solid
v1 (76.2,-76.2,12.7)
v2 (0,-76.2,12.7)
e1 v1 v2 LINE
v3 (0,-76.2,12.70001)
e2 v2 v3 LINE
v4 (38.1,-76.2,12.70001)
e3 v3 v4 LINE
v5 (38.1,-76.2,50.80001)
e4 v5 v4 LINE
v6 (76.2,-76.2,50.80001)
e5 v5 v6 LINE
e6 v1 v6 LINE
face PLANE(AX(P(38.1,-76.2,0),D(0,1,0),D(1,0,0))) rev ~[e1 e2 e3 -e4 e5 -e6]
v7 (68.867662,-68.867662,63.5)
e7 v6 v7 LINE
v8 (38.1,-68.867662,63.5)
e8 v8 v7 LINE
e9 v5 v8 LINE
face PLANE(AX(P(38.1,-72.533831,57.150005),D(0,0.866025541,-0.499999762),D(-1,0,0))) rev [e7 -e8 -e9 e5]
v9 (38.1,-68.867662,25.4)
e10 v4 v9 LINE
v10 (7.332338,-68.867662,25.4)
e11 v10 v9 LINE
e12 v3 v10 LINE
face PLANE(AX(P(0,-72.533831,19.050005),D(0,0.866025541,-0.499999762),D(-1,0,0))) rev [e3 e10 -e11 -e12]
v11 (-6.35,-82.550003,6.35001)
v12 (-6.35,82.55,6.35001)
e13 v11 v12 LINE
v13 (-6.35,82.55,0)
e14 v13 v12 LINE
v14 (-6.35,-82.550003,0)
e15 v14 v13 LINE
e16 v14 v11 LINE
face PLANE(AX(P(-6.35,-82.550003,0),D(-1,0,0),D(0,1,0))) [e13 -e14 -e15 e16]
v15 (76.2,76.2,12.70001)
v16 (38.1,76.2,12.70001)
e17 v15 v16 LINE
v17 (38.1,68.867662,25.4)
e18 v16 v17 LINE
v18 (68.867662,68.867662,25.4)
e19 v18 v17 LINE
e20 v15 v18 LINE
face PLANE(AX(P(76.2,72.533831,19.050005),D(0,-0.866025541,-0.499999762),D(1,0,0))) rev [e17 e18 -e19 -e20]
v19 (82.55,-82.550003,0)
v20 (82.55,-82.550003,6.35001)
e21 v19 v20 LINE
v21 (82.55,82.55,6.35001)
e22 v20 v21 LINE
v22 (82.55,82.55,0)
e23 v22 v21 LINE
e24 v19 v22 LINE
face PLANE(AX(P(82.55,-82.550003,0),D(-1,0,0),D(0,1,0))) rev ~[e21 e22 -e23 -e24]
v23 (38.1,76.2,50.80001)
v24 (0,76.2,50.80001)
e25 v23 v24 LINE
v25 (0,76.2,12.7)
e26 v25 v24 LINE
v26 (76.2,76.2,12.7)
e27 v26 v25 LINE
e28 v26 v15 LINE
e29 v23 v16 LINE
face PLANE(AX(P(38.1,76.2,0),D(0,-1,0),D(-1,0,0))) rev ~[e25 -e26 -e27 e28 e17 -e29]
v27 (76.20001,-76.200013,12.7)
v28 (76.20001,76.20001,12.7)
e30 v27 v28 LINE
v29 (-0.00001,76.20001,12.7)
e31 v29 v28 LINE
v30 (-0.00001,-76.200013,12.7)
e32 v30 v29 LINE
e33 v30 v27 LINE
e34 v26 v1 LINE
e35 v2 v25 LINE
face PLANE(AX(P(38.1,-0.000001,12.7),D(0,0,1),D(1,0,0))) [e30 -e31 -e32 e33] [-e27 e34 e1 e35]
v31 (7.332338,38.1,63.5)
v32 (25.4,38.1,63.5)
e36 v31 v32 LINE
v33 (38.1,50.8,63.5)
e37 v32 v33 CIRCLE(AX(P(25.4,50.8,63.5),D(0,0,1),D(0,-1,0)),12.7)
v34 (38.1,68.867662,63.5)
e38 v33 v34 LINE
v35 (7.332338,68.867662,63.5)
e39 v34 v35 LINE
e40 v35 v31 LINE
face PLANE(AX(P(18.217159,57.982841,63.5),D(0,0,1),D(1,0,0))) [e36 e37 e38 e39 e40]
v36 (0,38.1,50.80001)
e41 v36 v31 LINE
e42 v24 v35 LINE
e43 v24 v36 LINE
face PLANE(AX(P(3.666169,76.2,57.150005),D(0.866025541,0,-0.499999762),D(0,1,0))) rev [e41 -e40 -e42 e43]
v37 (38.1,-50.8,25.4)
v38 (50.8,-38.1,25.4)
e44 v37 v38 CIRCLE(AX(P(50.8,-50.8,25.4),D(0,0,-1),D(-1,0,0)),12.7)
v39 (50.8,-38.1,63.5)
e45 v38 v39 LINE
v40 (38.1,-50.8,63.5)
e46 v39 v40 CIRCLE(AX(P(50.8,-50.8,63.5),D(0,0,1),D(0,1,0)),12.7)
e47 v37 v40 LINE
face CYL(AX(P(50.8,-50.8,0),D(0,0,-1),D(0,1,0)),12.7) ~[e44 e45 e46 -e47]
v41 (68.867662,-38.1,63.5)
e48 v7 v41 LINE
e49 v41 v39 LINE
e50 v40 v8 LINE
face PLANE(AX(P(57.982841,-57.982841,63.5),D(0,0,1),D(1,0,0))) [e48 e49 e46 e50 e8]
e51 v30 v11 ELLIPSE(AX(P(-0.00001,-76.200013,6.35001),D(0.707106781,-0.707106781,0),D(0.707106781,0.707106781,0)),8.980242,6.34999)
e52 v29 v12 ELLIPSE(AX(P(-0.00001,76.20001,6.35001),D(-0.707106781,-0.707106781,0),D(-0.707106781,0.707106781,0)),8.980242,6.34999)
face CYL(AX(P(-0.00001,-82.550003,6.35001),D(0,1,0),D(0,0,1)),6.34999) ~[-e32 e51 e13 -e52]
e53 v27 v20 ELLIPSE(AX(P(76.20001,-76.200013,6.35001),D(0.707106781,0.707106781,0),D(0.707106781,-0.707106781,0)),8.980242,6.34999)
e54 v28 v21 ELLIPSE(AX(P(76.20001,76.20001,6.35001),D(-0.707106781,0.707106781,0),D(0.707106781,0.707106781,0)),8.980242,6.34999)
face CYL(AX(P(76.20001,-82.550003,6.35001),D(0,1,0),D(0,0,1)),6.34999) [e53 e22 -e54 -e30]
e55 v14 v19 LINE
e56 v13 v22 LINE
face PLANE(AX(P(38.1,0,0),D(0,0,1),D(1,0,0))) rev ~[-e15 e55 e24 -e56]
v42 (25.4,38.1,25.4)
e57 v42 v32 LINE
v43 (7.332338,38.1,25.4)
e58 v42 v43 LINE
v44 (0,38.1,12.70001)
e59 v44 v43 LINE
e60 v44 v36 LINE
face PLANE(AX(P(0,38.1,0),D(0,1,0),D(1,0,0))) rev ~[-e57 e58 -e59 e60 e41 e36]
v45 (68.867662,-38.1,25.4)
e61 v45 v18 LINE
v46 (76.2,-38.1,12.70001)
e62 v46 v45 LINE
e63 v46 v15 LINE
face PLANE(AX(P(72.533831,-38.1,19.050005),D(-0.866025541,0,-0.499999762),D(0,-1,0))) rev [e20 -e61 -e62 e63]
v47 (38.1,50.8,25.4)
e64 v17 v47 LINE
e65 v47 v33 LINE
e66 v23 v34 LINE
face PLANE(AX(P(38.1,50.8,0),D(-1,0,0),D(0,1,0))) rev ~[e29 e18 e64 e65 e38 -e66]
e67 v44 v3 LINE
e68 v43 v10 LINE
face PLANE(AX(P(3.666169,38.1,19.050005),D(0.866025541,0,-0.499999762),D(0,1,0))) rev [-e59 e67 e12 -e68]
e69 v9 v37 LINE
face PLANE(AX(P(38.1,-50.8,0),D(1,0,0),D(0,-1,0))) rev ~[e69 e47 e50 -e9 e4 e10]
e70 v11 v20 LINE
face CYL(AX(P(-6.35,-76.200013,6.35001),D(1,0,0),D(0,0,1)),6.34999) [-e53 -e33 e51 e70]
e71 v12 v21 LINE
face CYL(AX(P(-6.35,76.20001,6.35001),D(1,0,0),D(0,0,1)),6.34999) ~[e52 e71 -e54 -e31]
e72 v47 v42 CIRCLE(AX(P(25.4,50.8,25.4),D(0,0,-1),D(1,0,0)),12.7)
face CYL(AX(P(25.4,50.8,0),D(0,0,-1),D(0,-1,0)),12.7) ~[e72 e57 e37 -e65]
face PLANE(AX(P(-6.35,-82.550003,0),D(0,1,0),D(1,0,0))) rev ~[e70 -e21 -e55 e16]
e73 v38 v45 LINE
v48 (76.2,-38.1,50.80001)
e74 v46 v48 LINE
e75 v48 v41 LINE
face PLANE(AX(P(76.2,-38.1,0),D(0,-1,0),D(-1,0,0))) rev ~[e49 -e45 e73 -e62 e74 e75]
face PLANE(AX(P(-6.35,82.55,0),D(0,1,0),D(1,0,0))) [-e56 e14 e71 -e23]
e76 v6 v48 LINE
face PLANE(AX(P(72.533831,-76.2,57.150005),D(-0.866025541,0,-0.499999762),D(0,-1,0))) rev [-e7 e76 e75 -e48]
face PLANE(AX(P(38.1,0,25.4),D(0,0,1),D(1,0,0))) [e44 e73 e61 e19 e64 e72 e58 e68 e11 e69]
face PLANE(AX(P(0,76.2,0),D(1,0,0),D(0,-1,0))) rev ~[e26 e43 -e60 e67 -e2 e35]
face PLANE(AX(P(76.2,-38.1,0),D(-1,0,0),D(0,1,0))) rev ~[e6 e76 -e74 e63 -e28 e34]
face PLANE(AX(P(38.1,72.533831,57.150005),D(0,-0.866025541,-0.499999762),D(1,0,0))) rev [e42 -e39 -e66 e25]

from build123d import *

# Parameters (mm, degrees)
F0_W     = 88.9000000224
F0_H     = 165.1000027703
F1_DEPTH = 12.7
F2_DEPTH = 25.4
F3_DEPTH = 63.5
F4_R     = 6.34999
F5_SIZE2 = 7.332338
F5_SIZE  = 12.69999


# Not quite as in the source:
# - a fillet or chamfer is up to 0.001 mm smaller than in the source, because OpenCascade refuses the exact size


with BuildPart() as f1:
    # F0 (on Top) → F1 (new body)
    with BuildSketch(Plane.XY):
        with Locations((38.1000000112, -1.3851e-06)):
            Rectangle(F0_W, F0_H)
        Polygon((0, 38.1), (0, 76.2), (38.1, 76.2), (76.2, 76.2), (76.2, -38.1), (76.2, -76.2), (38.1, -76.2), (0, -76.2), align=None, mode=Mode.SUBTRACT)
    extrude(amount=F1_DEPTH)

    # F0 (on Top) → F2 (join)
    with BuildSketch(Plane.XY):
        with BuildLine():
            Line((25.4, 38.1), (0, 38.1))
            Line((0, 38.1), (0, -76.2))
            Line((0, -76.2), (38.1, -76.2))
            Line((38.1, -76.2), (38.1, -50.8))
            ThreePointArc((38.1, -50.8), (41.8197438789, -41.8197438789), (50.8, -38.1))
            Line((50.8, -38.1), (76.2, -38.1))
            Line((76.2, -38.1), (76.2, 76.2))
            Line((76.2, 76.2), (38.1, 76.2))
            Line((38.1, 76.2), (38.1, 50.8))
            ThreePointArc((38.1, 50.8), (34.3802561211, 41.8197438789), (25.4, 38.1))
        make_face()
    extrude(amount=F2_DEPTH)

    # F0 (on Top) → F3 (join)
    with BuildSketch(Plane.XY):
        with BuildLine():
            Line((38.1, 76.2), (0, 76.2))
            Line((0, 76.2), (0, 38.1))
            Line((0, 38.1), (25.4, 38.1))
            ThreePointArc((25.4, 38.1), (34.3802561211, 41.8197438789), (38.1, 50.8))
            Line((38.1, 50.8), (38.1, 76.2))
        make_face()
        with BuildLine():
            Line((38.1, -50.8), (38.1, -76.2))
            Line((38.1, -76.2), (76.2, -76.2))
            Line((76.2, -76.2), (76.2, -38.1))
            Line((76.2, -38.1), (50.8, -38.1))
            ThreePointArc((50.8, -38.1), (41.8197438789, -41.8197438789), (38.1, -50.8))
        make_face()
    extrude(amount=F3_DEPTH)

    # F4 (radius 6.35 in the source; OpenCascade refuses exactly that, so slightly less here)
    f4_edges = [f1.edges().sort_by_distance(p)[0] for p in [
        (-6.35, -1e-06, 12.7),
        (38.1, -82.550003, 12.7),
        (82.55, -1e-06, 12.7),
        (38.1, 82.55, 12.7),
    ]]
    fillet(f4_edges, radius=F4_R)

    # F5 (size 12.7 and 7.3323484187 in the source; OpenCascade refuses exactly that, so slightly less here)
    f5_edges = [f1.edges().sort_by_distance(p)[0] for p in [
        (57.15, 76.2, 25.4),
        (76.2, 19.05, 25.4),
        (0, -19.05, 25.4),
        (19.05, -76.2, 25.4),
        (57.15, -76.2, 63.5),
        (76.2, -57.15, 63.5),
        (19.05, 76.2, 63.5),
        (0, 57.15, 63.5),
    ]]
    chamfer(f5_edges, length=F5_SIZE, length2=F5_SIZE2)


solid = f1.part
